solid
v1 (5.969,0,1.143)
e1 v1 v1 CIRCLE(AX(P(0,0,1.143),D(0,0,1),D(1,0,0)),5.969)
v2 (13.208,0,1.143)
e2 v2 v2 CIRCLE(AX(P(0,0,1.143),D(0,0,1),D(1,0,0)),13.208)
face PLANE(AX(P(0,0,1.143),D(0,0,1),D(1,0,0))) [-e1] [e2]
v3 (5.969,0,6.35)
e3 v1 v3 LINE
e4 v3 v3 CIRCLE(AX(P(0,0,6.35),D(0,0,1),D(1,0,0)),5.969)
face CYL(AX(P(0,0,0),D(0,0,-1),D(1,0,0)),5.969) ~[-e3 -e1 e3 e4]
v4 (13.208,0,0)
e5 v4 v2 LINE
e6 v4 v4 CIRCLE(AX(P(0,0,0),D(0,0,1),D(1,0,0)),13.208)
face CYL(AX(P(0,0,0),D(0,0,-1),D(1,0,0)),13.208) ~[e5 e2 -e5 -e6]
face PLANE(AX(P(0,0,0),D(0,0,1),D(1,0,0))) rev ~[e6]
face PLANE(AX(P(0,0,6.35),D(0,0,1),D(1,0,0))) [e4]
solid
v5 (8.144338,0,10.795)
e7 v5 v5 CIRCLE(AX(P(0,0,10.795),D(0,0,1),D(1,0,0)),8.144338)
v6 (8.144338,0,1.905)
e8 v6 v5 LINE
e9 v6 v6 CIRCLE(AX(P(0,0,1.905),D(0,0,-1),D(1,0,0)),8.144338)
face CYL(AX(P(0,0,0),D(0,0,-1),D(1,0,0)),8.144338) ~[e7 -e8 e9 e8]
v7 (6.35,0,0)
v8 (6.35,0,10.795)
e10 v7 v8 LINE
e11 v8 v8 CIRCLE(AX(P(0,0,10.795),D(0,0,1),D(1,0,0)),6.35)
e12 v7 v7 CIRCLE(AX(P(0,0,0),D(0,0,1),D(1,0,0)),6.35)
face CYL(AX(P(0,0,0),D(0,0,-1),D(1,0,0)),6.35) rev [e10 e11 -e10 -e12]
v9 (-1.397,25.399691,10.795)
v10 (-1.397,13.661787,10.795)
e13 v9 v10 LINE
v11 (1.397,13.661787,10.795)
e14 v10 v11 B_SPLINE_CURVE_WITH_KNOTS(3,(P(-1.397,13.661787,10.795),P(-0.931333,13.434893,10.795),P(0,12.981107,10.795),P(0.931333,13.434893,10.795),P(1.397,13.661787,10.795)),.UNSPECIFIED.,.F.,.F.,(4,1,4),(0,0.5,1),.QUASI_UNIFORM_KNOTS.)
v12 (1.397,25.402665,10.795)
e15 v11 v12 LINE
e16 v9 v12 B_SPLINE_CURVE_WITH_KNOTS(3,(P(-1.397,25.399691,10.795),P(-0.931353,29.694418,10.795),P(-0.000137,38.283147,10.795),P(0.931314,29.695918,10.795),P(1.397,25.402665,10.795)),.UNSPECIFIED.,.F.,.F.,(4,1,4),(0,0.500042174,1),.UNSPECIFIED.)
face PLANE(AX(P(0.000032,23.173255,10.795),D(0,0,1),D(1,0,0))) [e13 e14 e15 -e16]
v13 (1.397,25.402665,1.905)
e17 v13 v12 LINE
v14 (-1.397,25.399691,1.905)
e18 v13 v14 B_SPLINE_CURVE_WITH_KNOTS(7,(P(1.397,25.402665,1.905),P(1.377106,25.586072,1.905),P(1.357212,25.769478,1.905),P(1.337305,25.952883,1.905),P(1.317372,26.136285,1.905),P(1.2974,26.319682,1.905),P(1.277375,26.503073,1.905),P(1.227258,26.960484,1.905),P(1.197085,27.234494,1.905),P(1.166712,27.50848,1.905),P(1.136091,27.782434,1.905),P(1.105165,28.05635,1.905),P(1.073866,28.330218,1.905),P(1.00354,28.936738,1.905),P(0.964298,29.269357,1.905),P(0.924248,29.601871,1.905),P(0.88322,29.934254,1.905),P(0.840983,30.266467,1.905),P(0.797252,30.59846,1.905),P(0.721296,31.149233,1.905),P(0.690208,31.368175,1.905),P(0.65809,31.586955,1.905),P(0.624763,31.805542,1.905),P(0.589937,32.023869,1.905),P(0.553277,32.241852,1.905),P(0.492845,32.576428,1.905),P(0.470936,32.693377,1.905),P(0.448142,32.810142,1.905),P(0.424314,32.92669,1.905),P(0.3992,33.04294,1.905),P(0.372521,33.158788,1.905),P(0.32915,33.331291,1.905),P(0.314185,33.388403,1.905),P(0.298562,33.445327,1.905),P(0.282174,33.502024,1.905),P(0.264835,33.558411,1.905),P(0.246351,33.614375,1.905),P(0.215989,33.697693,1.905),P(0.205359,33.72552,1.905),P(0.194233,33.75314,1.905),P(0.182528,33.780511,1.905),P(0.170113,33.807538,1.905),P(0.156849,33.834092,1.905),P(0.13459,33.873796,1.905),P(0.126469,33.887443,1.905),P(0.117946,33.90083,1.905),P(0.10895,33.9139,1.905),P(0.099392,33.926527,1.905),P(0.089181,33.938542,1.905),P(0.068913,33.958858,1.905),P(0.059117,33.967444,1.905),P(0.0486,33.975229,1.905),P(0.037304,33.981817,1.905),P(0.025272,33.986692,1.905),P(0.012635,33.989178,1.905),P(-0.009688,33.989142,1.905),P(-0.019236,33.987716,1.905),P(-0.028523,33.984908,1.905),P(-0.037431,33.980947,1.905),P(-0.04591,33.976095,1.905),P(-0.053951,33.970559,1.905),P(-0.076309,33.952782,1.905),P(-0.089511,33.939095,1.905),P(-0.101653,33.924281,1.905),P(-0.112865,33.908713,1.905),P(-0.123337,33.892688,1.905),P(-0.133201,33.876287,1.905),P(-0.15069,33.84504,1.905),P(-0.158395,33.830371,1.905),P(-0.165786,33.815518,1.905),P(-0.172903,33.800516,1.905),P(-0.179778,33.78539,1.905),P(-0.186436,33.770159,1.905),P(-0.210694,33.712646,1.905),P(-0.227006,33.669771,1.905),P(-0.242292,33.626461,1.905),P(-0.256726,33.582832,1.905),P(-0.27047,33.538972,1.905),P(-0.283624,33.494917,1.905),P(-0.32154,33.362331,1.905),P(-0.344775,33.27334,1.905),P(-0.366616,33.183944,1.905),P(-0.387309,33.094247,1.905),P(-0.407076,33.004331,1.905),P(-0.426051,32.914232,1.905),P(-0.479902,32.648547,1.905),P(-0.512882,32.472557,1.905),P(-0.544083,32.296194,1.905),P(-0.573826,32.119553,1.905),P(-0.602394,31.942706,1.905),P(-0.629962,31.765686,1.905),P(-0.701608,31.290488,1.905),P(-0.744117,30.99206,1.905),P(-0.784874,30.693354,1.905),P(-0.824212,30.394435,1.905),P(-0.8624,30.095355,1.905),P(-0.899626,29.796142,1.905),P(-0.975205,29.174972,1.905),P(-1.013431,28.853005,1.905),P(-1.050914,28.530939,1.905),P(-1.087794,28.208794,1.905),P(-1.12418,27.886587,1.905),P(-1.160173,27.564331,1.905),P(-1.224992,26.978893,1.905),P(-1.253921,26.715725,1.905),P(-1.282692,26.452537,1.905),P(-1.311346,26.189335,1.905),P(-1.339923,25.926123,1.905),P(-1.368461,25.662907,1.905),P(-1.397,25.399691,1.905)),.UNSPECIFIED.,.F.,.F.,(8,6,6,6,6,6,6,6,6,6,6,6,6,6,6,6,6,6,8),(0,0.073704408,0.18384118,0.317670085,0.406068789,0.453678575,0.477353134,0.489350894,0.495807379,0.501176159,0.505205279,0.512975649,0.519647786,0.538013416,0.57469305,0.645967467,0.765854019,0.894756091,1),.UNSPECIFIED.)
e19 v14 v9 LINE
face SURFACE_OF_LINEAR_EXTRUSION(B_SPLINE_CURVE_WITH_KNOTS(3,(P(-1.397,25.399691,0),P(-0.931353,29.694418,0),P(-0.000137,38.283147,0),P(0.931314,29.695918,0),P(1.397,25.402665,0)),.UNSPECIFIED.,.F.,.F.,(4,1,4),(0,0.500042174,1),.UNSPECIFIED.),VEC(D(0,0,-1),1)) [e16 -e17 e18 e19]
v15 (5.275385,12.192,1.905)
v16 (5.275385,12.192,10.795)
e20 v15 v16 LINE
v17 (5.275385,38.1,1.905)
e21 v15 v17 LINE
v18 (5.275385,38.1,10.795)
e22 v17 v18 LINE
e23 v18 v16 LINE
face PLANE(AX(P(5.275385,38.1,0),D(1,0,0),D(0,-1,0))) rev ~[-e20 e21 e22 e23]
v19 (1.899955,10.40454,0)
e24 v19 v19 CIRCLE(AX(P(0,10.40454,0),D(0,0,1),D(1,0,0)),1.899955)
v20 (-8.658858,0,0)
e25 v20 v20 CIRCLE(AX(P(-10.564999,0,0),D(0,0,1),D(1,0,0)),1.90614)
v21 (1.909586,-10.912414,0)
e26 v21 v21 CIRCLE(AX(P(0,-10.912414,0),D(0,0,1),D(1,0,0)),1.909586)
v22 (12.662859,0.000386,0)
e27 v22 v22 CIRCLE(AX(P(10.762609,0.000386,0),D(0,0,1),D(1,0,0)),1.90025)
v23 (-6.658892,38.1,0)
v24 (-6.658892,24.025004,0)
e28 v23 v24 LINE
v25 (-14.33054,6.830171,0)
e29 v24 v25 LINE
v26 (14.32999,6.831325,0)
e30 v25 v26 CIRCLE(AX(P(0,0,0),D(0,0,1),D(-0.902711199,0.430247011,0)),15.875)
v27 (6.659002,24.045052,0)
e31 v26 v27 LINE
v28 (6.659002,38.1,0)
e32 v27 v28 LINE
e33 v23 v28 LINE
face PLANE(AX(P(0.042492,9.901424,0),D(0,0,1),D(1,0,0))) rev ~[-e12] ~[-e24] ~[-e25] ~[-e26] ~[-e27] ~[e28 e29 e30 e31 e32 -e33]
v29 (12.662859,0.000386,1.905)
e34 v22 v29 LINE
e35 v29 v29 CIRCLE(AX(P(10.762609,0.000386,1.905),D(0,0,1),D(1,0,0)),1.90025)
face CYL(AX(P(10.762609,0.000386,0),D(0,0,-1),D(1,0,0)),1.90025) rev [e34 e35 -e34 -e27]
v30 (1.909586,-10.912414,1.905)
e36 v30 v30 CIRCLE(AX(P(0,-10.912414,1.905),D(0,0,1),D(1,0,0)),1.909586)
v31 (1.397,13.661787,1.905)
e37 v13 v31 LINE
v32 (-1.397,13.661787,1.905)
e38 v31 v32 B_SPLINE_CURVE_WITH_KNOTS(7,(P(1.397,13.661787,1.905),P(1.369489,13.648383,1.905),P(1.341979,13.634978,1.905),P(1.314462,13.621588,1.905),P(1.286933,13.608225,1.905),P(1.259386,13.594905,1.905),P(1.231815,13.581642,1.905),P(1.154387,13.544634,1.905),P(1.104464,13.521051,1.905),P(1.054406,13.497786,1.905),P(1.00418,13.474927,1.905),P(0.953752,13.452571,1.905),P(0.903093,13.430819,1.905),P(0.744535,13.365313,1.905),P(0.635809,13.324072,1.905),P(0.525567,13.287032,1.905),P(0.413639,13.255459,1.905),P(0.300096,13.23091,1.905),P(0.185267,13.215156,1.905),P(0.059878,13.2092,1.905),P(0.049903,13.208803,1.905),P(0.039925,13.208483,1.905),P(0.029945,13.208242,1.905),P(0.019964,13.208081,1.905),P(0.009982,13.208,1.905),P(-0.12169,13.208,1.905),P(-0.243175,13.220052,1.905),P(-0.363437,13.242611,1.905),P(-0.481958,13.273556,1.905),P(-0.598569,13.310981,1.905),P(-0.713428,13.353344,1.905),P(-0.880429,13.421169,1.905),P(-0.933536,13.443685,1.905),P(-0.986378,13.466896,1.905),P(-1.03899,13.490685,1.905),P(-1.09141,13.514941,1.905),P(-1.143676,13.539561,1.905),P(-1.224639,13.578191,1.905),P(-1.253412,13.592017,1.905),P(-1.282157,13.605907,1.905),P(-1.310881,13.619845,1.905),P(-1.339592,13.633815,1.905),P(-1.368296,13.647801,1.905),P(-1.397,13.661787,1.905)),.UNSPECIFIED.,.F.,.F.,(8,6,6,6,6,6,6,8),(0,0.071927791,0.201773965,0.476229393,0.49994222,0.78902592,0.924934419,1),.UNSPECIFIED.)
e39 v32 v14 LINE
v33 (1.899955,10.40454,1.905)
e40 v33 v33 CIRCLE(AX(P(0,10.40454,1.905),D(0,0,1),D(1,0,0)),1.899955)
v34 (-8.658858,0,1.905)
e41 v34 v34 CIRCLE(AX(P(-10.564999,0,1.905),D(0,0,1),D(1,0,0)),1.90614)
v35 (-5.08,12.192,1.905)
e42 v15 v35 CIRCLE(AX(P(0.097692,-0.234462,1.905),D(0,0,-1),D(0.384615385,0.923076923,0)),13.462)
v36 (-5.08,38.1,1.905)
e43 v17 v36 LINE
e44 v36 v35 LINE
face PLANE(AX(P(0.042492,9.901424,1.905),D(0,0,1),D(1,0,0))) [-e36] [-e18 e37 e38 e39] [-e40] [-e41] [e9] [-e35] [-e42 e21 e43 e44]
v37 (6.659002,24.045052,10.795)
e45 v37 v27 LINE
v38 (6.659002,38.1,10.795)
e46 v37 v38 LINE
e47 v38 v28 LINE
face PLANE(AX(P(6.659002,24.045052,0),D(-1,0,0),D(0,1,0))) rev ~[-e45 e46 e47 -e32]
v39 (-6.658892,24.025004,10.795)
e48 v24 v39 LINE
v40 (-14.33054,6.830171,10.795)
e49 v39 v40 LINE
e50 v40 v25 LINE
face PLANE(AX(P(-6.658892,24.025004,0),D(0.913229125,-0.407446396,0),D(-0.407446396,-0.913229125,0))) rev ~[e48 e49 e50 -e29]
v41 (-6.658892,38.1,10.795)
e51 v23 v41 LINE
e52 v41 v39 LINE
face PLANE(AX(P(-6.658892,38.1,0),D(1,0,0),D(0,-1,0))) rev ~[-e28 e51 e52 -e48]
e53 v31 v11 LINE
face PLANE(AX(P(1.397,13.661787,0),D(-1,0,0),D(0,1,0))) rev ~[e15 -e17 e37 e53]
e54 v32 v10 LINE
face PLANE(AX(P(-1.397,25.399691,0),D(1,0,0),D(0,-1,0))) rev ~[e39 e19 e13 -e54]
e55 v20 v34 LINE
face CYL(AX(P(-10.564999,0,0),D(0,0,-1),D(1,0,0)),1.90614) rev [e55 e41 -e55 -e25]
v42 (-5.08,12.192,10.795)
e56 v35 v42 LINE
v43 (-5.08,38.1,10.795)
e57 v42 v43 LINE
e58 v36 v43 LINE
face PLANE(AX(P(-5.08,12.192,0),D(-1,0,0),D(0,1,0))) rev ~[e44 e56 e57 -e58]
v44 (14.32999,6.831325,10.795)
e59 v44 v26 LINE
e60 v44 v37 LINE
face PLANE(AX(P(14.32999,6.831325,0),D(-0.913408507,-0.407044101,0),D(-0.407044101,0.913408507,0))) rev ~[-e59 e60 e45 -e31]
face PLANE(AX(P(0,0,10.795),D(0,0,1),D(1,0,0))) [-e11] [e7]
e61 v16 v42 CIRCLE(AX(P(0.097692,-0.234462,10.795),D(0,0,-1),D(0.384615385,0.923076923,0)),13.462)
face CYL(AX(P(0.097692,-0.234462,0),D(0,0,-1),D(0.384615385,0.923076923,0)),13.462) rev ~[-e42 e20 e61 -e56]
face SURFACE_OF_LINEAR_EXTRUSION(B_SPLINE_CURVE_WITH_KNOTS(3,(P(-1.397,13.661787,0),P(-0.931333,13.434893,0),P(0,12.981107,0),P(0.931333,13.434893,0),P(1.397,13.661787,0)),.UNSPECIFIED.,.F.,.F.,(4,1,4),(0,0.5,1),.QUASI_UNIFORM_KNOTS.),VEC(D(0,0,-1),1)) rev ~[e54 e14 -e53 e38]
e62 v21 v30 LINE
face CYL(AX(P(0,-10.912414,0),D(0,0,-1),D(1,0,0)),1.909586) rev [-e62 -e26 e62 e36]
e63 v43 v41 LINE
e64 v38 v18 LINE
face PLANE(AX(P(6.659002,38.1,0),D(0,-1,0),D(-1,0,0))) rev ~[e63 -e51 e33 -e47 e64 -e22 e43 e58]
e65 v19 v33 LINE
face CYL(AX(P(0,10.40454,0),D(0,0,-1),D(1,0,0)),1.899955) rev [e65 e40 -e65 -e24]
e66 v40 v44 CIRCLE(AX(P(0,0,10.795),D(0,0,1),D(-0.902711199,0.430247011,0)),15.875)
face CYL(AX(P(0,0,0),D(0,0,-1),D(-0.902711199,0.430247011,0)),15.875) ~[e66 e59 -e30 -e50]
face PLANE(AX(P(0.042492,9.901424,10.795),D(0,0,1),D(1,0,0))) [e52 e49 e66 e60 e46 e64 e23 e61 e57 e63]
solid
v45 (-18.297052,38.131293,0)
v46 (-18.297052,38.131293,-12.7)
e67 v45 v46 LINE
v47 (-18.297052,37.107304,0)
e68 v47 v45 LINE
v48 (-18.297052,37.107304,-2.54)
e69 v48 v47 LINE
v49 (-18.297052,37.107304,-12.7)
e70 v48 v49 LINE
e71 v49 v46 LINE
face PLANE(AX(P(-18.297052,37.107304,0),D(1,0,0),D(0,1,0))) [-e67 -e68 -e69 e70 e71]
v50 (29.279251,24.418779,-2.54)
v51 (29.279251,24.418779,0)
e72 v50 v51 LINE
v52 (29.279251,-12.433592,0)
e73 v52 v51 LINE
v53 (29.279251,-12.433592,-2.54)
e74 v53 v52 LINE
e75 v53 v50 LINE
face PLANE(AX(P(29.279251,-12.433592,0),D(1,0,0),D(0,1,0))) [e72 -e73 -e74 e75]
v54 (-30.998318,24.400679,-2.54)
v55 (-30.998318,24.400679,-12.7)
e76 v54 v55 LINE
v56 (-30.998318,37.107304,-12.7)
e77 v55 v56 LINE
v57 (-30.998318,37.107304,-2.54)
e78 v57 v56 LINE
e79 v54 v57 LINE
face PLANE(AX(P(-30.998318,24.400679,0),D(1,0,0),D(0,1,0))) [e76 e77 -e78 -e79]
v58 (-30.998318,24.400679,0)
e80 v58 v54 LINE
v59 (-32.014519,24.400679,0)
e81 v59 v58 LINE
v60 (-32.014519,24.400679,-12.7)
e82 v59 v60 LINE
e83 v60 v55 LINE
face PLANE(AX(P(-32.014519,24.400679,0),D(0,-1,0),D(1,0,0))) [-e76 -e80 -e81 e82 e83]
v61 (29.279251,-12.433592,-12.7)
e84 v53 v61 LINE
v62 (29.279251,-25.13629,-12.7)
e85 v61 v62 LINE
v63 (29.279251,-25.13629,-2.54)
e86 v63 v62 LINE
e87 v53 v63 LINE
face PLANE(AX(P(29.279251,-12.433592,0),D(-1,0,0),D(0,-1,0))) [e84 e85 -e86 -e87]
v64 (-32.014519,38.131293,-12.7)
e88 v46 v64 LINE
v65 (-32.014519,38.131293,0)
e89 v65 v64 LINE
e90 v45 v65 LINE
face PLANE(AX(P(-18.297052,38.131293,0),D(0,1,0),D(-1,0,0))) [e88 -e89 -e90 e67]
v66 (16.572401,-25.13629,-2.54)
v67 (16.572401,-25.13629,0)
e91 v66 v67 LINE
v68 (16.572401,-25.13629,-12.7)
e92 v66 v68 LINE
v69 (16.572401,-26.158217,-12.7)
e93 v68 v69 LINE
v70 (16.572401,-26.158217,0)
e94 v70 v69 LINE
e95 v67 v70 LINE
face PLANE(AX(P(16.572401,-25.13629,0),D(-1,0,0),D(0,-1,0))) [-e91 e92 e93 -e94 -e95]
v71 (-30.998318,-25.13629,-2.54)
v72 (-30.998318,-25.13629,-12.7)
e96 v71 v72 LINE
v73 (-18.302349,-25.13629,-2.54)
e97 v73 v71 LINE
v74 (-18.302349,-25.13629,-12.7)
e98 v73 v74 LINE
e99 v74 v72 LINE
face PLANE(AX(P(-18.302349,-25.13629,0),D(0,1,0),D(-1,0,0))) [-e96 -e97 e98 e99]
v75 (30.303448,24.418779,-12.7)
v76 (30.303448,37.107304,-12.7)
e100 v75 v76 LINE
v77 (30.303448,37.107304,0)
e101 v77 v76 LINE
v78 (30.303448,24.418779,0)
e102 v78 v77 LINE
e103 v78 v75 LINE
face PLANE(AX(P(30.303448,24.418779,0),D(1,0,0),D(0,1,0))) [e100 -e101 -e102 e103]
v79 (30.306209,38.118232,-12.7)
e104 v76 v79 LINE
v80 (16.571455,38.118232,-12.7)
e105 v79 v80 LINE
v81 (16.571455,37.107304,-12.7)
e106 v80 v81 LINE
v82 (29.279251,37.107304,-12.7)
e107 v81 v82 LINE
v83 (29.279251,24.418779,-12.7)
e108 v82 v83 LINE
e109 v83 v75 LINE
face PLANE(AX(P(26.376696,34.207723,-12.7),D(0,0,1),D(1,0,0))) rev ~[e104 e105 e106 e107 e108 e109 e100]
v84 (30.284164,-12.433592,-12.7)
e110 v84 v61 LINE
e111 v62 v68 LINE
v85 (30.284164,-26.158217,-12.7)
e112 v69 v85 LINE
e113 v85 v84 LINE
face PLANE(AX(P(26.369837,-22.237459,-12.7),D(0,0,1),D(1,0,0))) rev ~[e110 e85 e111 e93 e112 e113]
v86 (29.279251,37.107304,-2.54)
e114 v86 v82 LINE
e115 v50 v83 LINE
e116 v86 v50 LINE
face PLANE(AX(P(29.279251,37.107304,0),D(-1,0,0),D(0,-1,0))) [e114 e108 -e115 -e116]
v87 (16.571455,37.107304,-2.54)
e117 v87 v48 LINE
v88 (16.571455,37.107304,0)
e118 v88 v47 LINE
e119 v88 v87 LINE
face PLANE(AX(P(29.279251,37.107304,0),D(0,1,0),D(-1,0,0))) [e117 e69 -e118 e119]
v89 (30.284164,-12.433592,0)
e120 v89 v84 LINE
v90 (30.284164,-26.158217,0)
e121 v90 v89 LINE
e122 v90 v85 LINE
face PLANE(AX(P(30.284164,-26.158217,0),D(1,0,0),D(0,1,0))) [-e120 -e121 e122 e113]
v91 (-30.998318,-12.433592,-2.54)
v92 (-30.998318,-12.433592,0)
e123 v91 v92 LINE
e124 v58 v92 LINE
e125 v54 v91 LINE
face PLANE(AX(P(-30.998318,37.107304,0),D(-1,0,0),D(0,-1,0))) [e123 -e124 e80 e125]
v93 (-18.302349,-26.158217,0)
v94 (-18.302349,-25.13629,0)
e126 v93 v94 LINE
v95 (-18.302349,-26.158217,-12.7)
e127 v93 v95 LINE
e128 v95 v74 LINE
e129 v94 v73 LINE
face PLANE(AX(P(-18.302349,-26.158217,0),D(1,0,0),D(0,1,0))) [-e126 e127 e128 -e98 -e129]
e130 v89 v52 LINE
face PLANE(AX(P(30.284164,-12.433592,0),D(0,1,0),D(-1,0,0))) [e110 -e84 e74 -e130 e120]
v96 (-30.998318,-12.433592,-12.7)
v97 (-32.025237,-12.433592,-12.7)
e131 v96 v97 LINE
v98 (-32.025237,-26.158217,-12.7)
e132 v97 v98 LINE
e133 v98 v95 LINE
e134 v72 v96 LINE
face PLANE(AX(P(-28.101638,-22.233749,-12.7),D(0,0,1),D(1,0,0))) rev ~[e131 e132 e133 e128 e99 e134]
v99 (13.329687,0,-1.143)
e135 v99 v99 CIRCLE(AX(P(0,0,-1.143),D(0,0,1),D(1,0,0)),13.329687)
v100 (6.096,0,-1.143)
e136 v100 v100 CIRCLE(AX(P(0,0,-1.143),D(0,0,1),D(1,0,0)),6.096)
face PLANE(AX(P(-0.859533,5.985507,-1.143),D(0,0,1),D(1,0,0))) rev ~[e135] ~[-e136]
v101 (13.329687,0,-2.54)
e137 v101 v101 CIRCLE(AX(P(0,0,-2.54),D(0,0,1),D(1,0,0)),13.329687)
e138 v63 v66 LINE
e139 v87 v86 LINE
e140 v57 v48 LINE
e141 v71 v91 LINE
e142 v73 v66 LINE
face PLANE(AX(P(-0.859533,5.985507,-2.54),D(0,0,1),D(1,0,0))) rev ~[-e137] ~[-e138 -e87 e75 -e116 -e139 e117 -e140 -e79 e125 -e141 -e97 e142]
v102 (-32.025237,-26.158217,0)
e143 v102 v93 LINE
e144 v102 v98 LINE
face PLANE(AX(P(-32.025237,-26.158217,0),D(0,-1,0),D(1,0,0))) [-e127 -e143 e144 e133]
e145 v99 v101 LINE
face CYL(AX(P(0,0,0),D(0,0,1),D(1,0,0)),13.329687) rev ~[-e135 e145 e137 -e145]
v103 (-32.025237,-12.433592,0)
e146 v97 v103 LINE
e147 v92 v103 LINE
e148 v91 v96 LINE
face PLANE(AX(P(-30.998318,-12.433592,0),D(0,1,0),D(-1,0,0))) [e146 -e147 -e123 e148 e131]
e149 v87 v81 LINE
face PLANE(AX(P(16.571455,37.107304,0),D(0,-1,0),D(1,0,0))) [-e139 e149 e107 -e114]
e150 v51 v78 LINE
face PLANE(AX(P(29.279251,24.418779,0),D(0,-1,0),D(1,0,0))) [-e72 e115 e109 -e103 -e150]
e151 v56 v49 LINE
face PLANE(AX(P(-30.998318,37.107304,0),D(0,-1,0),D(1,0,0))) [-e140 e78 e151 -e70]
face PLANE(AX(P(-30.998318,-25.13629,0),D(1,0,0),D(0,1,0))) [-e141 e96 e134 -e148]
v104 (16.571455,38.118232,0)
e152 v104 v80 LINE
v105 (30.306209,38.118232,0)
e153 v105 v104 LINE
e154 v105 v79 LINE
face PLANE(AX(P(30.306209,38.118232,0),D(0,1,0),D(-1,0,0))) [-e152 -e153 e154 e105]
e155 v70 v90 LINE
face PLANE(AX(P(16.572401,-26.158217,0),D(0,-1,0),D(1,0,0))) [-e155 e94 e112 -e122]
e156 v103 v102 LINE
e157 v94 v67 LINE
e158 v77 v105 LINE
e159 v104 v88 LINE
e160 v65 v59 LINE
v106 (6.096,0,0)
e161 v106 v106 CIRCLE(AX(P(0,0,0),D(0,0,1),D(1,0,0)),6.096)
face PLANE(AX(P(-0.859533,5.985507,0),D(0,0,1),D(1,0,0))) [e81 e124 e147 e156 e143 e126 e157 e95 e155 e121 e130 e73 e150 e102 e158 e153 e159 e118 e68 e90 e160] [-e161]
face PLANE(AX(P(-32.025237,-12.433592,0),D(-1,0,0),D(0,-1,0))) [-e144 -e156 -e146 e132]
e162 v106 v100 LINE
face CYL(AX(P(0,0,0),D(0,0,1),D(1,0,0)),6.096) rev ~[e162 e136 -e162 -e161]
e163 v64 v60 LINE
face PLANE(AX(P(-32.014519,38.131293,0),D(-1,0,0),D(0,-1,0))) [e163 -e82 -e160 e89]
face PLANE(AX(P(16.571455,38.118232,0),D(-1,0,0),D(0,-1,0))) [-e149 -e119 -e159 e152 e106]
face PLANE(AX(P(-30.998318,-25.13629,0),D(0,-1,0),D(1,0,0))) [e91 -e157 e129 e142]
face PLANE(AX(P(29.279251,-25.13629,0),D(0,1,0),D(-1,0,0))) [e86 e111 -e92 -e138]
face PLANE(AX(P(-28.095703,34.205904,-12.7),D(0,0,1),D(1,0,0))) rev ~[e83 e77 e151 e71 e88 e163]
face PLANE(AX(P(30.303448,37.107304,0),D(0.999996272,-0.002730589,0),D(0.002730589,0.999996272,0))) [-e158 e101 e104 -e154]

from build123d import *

# Parameters (mm, degrees)
F0_R     = 1.9095863366
F0_R_2   = 1.9061403528
F0_R_3   = 8.144338214
F0_R_4   = 1.8999548266
F0_R_5   = 1.9002502649
F0_R_6   = 6.35
F1_DEPTH = 1.905
F2_DEPTH = 10.795
F3_R     = 5.969
F5_DEPTH = 6.35
F3_R_2   = 13.208
F6_DEPTH = 1.143
F4_R     = 13.329687055
F4_R_2   = 6.096
F7_DEPTH = 1.143
F8_DEPTH = 2.54
F9_DEPTH = 12.7


with BuildPart() as f1:
    # F0 (on Top) → F1 (new body)
    with BuildSketch(Plane.XY):
        with BuildLine():
            Line((-6.6588919425, 24.025004246), (-14.3305402873, 6.8301713064))
            ThreePointArc((-14.3305402873, 6.8301713064), (0.000639197, -15.8749999871), (14.3299902157, 6.8313253047))
            Line((14.3299902157, 6.8313253047), (6.6590019569, 24.045052064))
            Line((6.6590019569, 24.045052064), (6.6590019569, 38.1))
            Line((6.6590019569, 38.1), (5.2753846154, 38.1))
            Line((5.2753846154, 38.1), (5.2753846154, 12.192))
            ThreePointArc((5.2753846154, 12.192), (0.0976923077, -13.6964615385), (-5.08, 12.192))
            Line((-5.08, 12.192), (-5.08, 38.1))
            Line((-5.08, 38.1), (-6.6588919425, 38.1))
            Line((-6.6588919425, 38.1), (-6.6588919425, 24.025004246))
        make_face()
        with BuildLine():
            Line((5.2753846154, 38.1), (-5.08, 38.1))
            Line((-5.08, 38.1), (-5.08, 12.192))
            ThreePointArc((-5.08, 12.192), (0.0976923077, -13.6964615385), (5.2753846154, 12.192))
            Line((5.2753846154, 12.192), (5.2753846154, 38.1))
        make_face()
        with Locations((0, -10.9124137089)):
            Circle(F0_R, mode=Mode.SUBTRACT)
        with Locations((-10.5649987236, 0)):
            Circle(F0_R_2, mode=Mode.SUBTRACT)
        Circle(F0_R_3, mode=Mode.SUBTRACT)
        with Locations((0, 10.4045402259)):
            Circle(F0_R_4, mode=Mode.SUBTRACT)
        with Locations((10.7626086032, 0.0003860946)):
            Circle(F0_R_5, mode=Mode.SUBTRACT)
        with BuildLine():
            add(Edge.make_bspline(
                [(-1.397, 13.6617869139), (-0.9313333333, 13.4348934569), (0, 12.9811065431), (0.9313333333, 13.4348934569), (1.397, 13.6617869139)],
                knots=[0, 0, 0, 0, 0.5, 1, 1, 1, 1], degree=3))
            Line((-1.397, 13.6617869139), (-1.397, 17.2657109797))
            Line((-1.397, 17.2657109797), (-1.397, 25.3996907175))
            add(Edge.make_bspline(
                [(-1.397, 25.3996907175), (-0.9313529757, 29.6944177327), (-0.0001374736, 38.2831473186), (0.9313136976, 29.69591761), (1.397, 25.4026649147)],
                knots=[0, 0, 0, 0, 0.5000421741, 1, 1, 1, 1], degree=3))
            Line((1.397, 25.4026649147), (1.397, 17.2657109797))
            Line((1.397, 17.2657109797), (1.397, 13.6617869139))
        make_face(mode=Mode.SUBTRACT)
        with BuildLine():
            Line((-1.397, 17.2657109797), (-1.397, 13.6617869139))
            add(Edge.make_bspline(
                [(-1.397, 13.6617869139), (-0.9313333333, 13.4348934569), (0, 12.9811065431), (0.9313333333, 13.4348934569), (1.397, 13.6617869139)],
                knots=[0, 0, 0, 0, 0.5, 1, 1, 1, 1], degree=3))
            Line((1.397, 13.6617869139), (1.397, 17.2657109797))
            Line((1.397, 17.2657109797), (1.397, 25.4026649147))
            add(Edge.make_bspline(
                [(-1.397, 25.3996907175), (-0.9313529757, 29.6944177327), (-0.0001374736, 38.2831473186), (0.9313136976, 29.69591761), (1.397, 25.4026649147)],
                knots=[0, 0, 0, 0, 0.5000421741, 1, 1, 1, 1], degree=3))
            Line((-1.397, 25.3996907175), (-1.397, 17.2657109797))
        make_face()
        Circle(F0_R_3)
        Circle(F0_R_6, mode=Mode.SUBTRACT)
    extrude(amount=F1_DEPTH)

    # F0 (on Top) → F2 (join)
    with BuildSketch(Plane.XY):
        Circle(F0_R_3)
        Circle(F0_R_6, mode=Mode.SUBTRACT)
        with BuildLine():
            Line((-6.6588919425, 24.025004246), (-14.3305402873, 6.8301713064))
            ThreePointArc((-14.3305402873, 6.8301713064), (0.000639197, -15.8749999871), (14.3299902157, 6.8313253047))
            Line((14.3299902157, 6.8313253047), (6.6590019569, 24.045052064))
            Line((6.6590019569, 24.045052064), (6.6590019569, 38.1))
            Line((6.6590019569, 38.1), (5.2753846154, 38.1))
            Line((5.2753846154, 38.1), (5.2753846154, 12.192))
            ThreePointArc((5.2753846154, 12.192), (0.0976923077, -13.6964615385), (-5.08, 12.192))
            Line((-5.08, 12.192), (-5.08, 38.1))
            Line((-5.08, 38.1), (-6.6588919425, 38.1))
            Line((-6.6588919425, 38.1), (-6.6588919425, 24.025004246))
        make_face()
        with BuildLine():
            Line((-1.397, 17.2657109797), (-1.397, 13.6617869139))
            add(Edge.make_bspline(
                [(-1.397, 13.6617869139), (-0.9313333333, 13.4348934569), (0, 12.9811065431), (0.9313333333, 13.4348934569), (1.397, 13.6617869139)],
                knots=[0, 0, 0, 0, 0.5, 1, 1, 1, 1], degree=3))
            Line((1.397, 13.6617869139), (1.397, 17.2657109797))
            Line((1.397, 17.2657109797), (1.397, 25.4026649147))
            add(Edge.make_bspline(
                [(-1.397, 25.3996907175), (-0.9313529757, 29.6944177327), (-0.0001374736, 38.2831473186), (0.9313136976, 29.69591761), (1.397, 25.4026649147)],
                knots=[0, 0, 0, 0, 0.5000421741, 1, 1, 1, 1], degree=3))
            Line((-1.397, 25.3996907175), (-1.397, 17.2657109797))
        make_face()
    extrude(amount=F2_DEPTH)


with BuildPart() as f5:
    # F3 (on Top) → F5 (new body)
    with BuildSketch(Plane.XY):
        Circle(F3_R)
    extrude(amount=F5_DEPTH)

    # F3 (on Top) → F6 (join)
    with BuildSketch(Plane.XY):
        Circle(F3_R_2)
        Circle(F3_R, mode=Mode.SUBTRACT)
    extrude(amount=F6_DEPTH)


with BuildPart() as f7:
    # F4 (on Top) → F7 (new body)
    with BuildSketch(Plane.XY):
        Polygon((-30.9983175248, -12.4335922301), (-30.9983175248, -25.1362901181), (-18.3023493737, -25.1362901181), (0, -25.1362901181), (16.5724009275, -25.1362901181), (29.2792506516, -25.1362901181), (29.2792506516, -12.4335922301), (29.2792506516, 24.4187787175), (29.2792506516, 37.1073037386), (16.5714547038, 37.1073037386), (-18.2970520109, 37.1073037386), (-30.9983175248, 37.1073037386), (-30.9983175248, 24.4006793946), (-30.9983175248, 0), align=None)
        Circle(F4_R, mode=Mode.SUBTRACT)
        Circle(F4_R)
        Circle(F4_R_2, mode=Mode.SUBTRACT)
        Polygon((29.2792506516, -25.1362901181), (16.5724009275, -25.1362901181), (16.5724009275, -26.1582173407), (29.2792506516, -26.1582173407), (30.2841644734, -26.1582173407), (30.2841644734, -25.1362901181), (30.2841644734, -12.4335922301), (29.2792506516, -12.4335922301), align=None)
    extrude(amount=-F7_DEPTH)

    # F4 (on Top) → F8 (join)
    with BuildSketch(Plane.XY):
        Polygon((-30.9983175248, -12.4335922301), (-30.9983175248, -25.1362901181), (-18.3023493737, -25.1362901181), (0, -25.1362901181), (16.5724009275, -25.1362901181), (29.2792506516, -25.1362901181), (29.2792506516, -12.4335922301), (29.2792506516, 24.4187787175), (29.2792506516, 37.1073037386), (16.5714547038, 37.1073037386), (-18.2970520109, 37.1073037386), (-30.9983175248, 37.1073037386), (-30.9983175248, 24.4006793946), (-30.9983175248, 0), align=None)
        Circle(F4_R, mode=Mode.SUBTRACT)
        Polygon((-18.3023493737, -25.1362901181), (-30.9983175248, -25.1362901181), (-30.9983175248, -12.4335922301), (-32.0252366364, -12.4335922301), (-32.0252366364, -25.1362901181), (-32.0252366364, -26.1582173407), (-30.9983175248, -26.1582173407), (-18.3023493737, -26.1582173407), align=None)
        Polygon((29.2792506516, -25.1362901181), (16.5724009275, -25.1362901181), (16.5724009275, -26.1582173407), (29.2792506516, -26.1582173407), (30.2841644734, -26.1582173407), (30.2841644734, -25.1362901181), (30.2841644734, -12.4335922301), (29.2792506516, -12.4335922301), align=None)
        Polygon((-32.0145189762, 24.4006793946), (-30.9983175248, 24.4006793946), (-30.9983175248, 37.1073037386), (-18.2970520109, 37.1073037386), (-18.2970520109, 38.1312929094), (-30.9983175248, 38.1312929094), (-32.0145189762, 38.1312929094), (-32.0145189762, 37.1073037386), align=None)
        Polygon((29.2792506516, 37.1073037386), (29.2792506516, 24.4187787175), (30.3034484386, 24.4187787175), (30.3034484386, 37.1073037386), (30.3062088788, 38.1182320416), (29.2792506516, 38.1182320416), (16.5714547038, 38.1182320416), (16.5714547038, 37.1073037386), align=None)
    extrude(amount=-F8_DEPTH)

    # F4 (on Top) → F9 (join)
    with BuildSketch(Plane.XY):
        Polygon((-32.0145189762, 24.4006793946), (-30.9983175248, 24.4006793946), (-30.9983175248, 37.1073037386), (-18.2970520109, 37.1073037386), (-18.2970520109, 38.1312929094), (-30.9983175248, 38.1312929094), (-32.0145189762, 38.1312929094), (-32.0145189762, 37.1073037386), align=None)
        Polygon((-18.3023493737, -25.1362901181), (-30.9983175248, -25.1362901181), (-30.9983175248, -12.4335922301), (-32.0252366364, -12.4335922301), (-32.0252366364, -25.1362901181), (-32.0252366364, -26.1582173407), (-30.9983175248, -26.1582173407), (-18.3023493737, -26.1582173407), align=None)
        Polygon((29.2792506516, -25.1362901181), (16.5724009275, -25.1362901181), (16.5724009275, -26.1582173407), (29.2792506516, -26.1582173407), (30.2841644734, -26.1582173407), (30.2841644734, -25.1362901181), (30.2841644734, -12.4335922301), (29.2792506516, -12.4335922301), align=None)
        Polygon((29.2792506516, 37.1073037386), (29.2792506516, 24.4187787175), (30.3034484386, 24.4187787175), (30.3034484386, 37.1073037386), (30.3062088788, 38.1182320416), (29.2792506516, 38.1182320416), (16.5714547038, 38.1182320416), (16.5714547038, 37.1073037386), align=None)
    extrude(amount=-F9_DEPTH)


solid = Compound([f1.part, f5.part, f7.part])
